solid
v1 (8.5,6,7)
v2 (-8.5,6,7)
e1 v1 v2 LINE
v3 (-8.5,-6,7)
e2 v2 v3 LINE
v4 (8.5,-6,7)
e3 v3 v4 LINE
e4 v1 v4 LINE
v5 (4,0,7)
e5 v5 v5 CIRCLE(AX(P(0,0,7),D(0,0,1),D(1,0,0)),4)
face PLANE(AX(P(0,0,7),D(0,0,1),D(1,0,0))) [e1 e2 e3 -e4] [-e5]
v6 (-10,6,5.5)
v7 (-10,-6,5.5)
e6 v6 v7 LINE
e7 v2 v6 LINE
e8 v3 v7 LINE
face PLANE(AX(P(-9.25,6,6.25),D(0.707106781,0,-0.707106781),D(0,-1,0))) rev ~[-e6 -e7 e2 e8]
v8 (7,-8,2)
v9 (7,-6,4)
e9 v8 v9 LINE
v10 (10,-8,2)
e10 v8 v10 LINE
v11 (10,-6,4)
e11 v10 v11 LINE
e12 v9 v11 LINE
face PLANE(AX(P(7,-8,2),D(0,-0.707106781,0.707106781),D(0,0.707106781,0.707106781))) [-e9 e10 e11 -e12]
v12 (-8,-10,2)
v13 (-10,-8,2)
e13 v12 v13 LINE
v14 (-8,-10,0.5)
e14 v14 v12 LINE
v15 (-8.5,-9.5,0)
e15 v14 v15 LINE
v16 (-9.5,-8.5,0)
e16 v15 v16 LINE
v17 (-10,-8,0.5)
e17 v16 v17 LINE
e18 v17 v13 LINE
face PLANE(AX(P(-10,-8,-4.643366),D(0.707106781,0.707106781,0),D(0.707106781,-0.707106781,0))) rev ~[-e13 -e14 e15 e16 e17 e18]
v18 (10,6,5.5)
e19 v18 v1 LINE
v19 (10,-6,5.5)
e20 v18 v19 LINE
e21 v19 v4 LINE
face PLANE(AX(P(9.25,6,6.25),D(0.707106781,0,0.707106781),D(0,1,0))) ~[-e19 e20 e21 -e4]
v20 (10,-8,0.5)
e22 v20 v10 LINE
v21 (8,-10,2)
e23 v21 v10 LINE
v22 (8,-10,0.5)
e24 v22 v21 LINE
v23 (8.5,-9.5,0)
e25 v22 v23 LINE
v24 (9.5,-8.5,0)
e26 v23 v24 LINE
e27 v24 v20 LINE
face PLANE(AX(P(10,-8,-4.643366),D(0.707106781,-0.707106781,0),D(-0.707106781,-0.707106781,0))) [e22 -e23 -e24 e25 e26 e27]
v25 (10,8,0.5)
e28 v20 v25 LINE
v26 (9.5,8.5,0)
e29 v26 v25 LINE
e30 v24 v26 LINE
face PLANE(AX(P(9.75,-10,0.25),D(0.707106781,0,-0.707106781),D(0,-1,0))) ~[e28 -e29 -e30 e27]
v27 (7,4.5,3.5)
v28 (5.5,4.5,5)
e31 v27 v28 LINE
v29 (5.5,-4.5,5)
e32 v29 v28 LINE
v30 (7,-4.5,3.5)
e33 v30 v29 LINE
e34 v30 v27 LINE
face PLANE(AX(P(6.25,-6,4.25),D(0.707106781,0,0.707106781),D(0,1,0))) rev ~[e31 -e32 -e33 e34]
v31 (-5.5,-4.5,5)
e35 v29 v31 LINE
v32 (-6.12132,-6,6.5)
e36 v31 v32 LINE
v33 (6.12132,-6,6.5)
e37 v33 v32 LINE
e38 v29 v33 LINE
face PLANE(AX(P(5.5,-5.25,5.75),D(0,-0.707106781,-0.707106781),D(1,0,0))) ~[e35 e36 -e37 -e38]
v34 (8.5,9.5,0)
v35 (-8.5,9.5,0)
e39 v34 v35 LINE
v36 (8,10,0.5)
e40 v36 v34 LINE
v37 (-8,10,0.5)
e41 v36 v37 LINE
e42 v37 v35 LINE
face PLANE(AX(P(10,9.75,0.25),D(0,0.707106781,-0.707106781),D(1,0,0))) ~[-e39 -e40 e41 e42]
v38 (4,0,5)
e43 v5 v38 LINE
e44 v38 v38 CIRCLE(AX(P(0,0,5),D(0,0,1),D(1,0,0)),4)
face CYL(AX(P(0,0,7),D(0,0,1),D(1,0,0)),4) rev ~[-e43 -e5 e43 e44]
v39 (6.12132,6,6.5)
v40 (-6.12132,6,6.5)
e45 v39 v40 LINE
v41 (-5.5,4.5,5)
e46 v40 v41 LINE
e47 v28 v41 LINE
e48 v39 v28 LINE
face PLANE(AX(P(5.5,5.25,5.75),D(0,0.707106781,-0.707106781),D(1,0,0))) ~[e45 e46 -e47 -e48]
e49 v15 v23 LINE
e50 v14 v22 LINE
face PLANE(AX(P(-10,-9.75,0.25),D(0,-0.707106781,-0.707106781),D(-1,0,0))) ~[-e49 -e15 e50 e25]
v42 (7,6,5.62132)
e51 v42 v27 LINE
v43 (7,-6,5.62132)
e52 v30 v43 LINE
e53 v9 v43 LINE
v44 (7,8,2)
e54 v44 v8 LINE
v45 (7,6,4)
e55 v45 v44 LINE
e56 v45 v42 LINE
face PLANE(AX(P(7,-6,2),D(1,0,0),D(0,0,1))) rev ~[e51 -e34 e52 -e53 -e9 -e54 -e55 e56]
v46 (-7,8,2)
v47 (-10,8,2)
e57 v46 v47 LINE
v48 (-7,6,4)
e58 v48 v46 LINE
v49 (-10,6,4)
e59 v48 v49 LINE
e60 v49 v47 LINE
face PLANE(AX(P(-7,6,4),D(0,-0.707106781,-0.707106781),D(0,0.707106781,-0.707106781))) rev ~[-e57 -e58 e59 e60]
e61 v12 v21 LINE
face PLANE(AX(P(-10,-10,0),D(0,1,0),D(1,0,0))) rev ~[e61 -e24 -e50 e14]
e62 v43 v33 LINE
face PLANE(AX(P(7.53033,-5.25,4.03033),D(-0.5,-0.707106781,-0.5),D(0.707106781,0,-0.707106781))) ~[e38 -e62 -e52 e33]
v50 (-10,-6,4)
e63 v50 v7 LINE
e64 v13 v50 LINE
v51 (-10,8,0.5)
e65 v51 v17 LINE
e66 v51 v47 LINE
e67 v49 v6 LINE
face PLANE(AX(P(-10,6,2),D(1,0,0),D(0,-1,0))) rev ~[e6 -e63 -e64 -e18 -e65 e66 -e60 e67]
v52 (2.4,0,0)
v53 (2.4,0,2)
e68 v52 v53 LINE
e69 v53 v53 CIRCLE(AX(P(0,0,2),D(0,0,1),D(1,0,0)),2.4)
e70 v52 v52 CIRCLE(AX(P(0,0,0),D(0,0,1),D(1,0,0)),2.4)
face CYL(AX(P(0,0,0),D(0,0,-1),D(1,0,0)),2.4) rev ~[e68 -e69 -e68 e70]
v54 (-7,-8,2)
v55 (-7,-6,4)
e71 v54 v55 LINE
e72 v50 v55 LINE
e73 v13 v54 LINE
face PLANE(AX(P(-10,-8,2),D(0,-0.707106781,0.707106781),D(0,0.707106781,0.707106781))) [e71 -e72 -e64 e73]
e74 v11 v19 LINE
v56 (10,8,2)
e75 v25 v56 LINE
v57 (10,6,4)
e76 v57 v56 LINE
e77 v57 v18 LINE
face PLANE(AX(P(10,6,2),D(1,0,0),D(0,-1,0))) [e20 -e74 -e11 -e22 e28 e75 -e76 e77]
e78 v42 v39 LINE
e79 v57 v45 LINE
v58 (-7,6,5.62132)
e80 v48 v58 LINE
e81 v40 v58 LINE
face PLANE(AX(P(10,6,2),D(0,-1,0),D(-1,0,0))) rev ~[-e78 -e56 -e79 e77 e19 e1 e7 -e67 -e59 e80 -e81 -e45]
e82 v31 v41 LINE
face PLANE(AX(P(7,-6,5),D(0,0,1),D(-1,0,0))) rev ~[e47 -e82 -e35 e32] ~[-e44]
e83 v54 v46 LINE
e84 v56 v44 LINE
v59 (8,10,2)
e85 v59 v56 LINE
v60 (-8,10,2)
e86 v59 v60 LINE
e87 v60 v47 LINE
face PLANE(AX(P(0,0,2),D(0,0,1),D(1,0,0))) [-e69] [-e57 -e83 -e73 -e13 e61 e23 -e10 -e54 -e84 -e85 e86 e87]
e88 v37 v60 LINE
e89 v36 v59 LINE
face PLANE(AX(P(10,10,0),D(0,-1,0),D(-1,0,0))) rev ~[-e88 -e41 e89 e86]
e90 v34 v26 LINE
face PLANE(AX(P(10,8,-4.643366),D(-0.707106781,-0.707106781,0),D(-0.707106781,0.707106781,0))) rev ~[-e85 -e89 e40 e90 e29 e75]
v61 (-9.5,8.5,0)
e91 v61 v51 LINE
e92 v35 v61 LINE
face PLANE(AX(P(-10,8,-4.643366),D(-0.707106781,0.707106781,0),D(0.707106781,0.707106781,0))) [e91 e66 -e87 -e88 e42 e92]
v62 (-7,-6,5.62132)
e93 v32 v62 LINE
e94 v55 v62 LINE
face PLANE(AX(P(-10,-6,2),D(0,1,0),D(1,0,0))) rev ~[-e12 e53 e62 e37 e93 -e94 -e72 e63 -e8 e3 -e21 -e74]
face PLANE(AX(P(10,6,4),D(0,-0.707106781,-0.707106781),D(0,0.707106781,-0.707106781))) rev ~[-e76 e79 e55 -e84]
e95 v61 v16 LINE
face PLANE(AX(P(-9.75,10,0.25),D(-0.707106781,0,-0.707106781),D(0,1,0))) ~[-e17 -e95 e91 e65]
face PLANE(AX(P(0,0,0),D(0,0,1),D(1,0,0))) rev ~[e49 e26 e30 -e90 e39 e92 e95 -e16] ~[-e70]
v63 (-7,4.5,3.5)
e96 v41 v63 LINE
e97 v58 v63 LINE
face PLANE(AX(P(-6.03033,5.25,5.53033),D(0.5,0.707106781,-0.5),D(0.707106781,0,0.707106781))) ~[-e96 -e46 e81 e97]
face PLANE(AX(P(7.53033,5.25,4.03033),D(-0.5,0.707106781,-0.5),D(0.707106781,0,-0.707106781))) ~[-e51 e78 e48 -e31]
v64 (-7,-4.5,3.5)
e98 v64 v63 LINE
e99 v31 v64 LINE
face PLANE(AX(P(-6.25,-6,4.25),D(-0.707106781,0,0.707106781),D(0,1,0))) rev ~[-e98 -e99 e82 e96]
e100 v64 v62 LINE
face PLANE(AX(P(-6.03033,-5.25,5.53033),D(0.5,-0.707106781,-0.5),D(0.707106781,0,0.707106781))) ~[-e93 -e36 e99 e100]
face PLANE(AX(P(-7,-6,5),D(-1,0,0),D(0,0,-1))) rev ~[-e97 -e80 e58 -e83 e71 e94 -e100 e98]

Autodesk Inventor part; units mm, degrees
ref_plane "YZ Plane" through (0, 0, 0) normal (1, 0, 0) x (0, 1, 0)
ref_plane "XZ Plane" through (0, 0, 0) normal (0, 1, 0) x (-1, 0, 0)
ref_plane "XY Plane" through (0, 0, 0) normal (0, 0, 1) x (1, 0, 0)
sketch "Sketch1" plane through (0, 0, 0) normal (0, 0, 1) x (1, 0, 0)
  line L0 (-10, -10) -> (10, -10)
  line L1 (10, -10) -> (10, 10)
  line L2 (10, 10) -> (-10, 10)
  line L3 (-10, 10) -> (-10, -10)
  line L4 (-10, -10) -> (10, 10) construction
  line L5 (10, -10) -> (-10, 10) construction
  circle A0 centre (0, 0) radius 2.4
  dimension "d0" = 20
  dimension "d1" = 20
  dimension "d2" = 4.8
extrude "Extrusion1" add sketch "Sketch1" along normal blind 2
chamfer "Chamfer1" distance 0.5 angle 45 4 edges at (10, 0, 0) (0, 10, 0) (-10, 0, 0) (0, -10, 0)
sketch "Sketch2" plane through (0, 0, 2) normal (0, 0, 1) x (1, 0, 0)
  line L0 (10, 10) -> (10, -10) projected
  line L1 (-10, -6) -> (10, -6)
  line L2 (10, -6) -> (10, 6)
  line L3 (10, 6) -> (-10, 6)
  line L4 (-10, 6) -> (-10, -6)
  line L5 (-10, -6) -> (10, 6) construction
  line L6 (10, -6) -> (-10, 6) construction
  point P0 (0, 0)
  point P1 (10, -6)
  dimension "d8" = 12
extrude "Extrusion2" add sketch "Sketch2" along normal blind 5
sketch "Sketch5" plane through (-10, -6, 2) normal (0, -1, 0) x (1, 0, 0)
  line L0 (20, 0) -> (0, 0) projected
  line L1 (3, 0) -> (17, 0)
  line L2 (17, 0) -> (17, 3)
  line L3 (17, 3) -> (3, 3)
  line L4 (3, 3) -> (3, 0)
  line L5 (0, 0) -> (0, 5) projected
  line L6 (20, 0) -> (20, 5) projected
  point P0 (10, -2)
  dimension "d18" = 3
  dimension "d19" = 3
  dimension "d20" = 3
extrude "Extrusion4" cut sketch "Sketch5" against normal through all
sketch "Sketch6" plane through (0, 0, 7) normal (0, 0, 1) x (1, 0, 0)
  circle A0 centre (0, 0) radius 2.4 construction
  circle A1 centre (0, 0) radius 4
  dimension "d23" = 8
extrude "Extrusion5" cut sketch "Sketch6" against normal up to surface (5 mm away)
chamfer "Chamfer4" distance 1.5 angle 45 2 edges at (-7, 0, 5) (7, 0, 5)
chamfer "Chamfer5" distance 1.5 angle 45 6 edges at (0, -6, 5) (0, 6, 5) (-6.25, -6, 4.25) (6.25, -6, 4.25) (6.25, 6, 4.25) (-6.25, 6, 4.25)
chamfer "Chamfer6" distance 1.5 angle 45 2 edges at (-10, 0, 7) (10, 0, 7)
chamfer "Chamfer7" distance 2 angle 45 8 edges at (10, 10, 1.25) (-10, 10, 1.25) (-10, -10, 1.25) (10, -10, 1.25) (8.5, -6, 2) (-8.5, -6, 2) (-8.5, 6, 2) (8.5, 6, 2)
properties part number "CableHolder"
